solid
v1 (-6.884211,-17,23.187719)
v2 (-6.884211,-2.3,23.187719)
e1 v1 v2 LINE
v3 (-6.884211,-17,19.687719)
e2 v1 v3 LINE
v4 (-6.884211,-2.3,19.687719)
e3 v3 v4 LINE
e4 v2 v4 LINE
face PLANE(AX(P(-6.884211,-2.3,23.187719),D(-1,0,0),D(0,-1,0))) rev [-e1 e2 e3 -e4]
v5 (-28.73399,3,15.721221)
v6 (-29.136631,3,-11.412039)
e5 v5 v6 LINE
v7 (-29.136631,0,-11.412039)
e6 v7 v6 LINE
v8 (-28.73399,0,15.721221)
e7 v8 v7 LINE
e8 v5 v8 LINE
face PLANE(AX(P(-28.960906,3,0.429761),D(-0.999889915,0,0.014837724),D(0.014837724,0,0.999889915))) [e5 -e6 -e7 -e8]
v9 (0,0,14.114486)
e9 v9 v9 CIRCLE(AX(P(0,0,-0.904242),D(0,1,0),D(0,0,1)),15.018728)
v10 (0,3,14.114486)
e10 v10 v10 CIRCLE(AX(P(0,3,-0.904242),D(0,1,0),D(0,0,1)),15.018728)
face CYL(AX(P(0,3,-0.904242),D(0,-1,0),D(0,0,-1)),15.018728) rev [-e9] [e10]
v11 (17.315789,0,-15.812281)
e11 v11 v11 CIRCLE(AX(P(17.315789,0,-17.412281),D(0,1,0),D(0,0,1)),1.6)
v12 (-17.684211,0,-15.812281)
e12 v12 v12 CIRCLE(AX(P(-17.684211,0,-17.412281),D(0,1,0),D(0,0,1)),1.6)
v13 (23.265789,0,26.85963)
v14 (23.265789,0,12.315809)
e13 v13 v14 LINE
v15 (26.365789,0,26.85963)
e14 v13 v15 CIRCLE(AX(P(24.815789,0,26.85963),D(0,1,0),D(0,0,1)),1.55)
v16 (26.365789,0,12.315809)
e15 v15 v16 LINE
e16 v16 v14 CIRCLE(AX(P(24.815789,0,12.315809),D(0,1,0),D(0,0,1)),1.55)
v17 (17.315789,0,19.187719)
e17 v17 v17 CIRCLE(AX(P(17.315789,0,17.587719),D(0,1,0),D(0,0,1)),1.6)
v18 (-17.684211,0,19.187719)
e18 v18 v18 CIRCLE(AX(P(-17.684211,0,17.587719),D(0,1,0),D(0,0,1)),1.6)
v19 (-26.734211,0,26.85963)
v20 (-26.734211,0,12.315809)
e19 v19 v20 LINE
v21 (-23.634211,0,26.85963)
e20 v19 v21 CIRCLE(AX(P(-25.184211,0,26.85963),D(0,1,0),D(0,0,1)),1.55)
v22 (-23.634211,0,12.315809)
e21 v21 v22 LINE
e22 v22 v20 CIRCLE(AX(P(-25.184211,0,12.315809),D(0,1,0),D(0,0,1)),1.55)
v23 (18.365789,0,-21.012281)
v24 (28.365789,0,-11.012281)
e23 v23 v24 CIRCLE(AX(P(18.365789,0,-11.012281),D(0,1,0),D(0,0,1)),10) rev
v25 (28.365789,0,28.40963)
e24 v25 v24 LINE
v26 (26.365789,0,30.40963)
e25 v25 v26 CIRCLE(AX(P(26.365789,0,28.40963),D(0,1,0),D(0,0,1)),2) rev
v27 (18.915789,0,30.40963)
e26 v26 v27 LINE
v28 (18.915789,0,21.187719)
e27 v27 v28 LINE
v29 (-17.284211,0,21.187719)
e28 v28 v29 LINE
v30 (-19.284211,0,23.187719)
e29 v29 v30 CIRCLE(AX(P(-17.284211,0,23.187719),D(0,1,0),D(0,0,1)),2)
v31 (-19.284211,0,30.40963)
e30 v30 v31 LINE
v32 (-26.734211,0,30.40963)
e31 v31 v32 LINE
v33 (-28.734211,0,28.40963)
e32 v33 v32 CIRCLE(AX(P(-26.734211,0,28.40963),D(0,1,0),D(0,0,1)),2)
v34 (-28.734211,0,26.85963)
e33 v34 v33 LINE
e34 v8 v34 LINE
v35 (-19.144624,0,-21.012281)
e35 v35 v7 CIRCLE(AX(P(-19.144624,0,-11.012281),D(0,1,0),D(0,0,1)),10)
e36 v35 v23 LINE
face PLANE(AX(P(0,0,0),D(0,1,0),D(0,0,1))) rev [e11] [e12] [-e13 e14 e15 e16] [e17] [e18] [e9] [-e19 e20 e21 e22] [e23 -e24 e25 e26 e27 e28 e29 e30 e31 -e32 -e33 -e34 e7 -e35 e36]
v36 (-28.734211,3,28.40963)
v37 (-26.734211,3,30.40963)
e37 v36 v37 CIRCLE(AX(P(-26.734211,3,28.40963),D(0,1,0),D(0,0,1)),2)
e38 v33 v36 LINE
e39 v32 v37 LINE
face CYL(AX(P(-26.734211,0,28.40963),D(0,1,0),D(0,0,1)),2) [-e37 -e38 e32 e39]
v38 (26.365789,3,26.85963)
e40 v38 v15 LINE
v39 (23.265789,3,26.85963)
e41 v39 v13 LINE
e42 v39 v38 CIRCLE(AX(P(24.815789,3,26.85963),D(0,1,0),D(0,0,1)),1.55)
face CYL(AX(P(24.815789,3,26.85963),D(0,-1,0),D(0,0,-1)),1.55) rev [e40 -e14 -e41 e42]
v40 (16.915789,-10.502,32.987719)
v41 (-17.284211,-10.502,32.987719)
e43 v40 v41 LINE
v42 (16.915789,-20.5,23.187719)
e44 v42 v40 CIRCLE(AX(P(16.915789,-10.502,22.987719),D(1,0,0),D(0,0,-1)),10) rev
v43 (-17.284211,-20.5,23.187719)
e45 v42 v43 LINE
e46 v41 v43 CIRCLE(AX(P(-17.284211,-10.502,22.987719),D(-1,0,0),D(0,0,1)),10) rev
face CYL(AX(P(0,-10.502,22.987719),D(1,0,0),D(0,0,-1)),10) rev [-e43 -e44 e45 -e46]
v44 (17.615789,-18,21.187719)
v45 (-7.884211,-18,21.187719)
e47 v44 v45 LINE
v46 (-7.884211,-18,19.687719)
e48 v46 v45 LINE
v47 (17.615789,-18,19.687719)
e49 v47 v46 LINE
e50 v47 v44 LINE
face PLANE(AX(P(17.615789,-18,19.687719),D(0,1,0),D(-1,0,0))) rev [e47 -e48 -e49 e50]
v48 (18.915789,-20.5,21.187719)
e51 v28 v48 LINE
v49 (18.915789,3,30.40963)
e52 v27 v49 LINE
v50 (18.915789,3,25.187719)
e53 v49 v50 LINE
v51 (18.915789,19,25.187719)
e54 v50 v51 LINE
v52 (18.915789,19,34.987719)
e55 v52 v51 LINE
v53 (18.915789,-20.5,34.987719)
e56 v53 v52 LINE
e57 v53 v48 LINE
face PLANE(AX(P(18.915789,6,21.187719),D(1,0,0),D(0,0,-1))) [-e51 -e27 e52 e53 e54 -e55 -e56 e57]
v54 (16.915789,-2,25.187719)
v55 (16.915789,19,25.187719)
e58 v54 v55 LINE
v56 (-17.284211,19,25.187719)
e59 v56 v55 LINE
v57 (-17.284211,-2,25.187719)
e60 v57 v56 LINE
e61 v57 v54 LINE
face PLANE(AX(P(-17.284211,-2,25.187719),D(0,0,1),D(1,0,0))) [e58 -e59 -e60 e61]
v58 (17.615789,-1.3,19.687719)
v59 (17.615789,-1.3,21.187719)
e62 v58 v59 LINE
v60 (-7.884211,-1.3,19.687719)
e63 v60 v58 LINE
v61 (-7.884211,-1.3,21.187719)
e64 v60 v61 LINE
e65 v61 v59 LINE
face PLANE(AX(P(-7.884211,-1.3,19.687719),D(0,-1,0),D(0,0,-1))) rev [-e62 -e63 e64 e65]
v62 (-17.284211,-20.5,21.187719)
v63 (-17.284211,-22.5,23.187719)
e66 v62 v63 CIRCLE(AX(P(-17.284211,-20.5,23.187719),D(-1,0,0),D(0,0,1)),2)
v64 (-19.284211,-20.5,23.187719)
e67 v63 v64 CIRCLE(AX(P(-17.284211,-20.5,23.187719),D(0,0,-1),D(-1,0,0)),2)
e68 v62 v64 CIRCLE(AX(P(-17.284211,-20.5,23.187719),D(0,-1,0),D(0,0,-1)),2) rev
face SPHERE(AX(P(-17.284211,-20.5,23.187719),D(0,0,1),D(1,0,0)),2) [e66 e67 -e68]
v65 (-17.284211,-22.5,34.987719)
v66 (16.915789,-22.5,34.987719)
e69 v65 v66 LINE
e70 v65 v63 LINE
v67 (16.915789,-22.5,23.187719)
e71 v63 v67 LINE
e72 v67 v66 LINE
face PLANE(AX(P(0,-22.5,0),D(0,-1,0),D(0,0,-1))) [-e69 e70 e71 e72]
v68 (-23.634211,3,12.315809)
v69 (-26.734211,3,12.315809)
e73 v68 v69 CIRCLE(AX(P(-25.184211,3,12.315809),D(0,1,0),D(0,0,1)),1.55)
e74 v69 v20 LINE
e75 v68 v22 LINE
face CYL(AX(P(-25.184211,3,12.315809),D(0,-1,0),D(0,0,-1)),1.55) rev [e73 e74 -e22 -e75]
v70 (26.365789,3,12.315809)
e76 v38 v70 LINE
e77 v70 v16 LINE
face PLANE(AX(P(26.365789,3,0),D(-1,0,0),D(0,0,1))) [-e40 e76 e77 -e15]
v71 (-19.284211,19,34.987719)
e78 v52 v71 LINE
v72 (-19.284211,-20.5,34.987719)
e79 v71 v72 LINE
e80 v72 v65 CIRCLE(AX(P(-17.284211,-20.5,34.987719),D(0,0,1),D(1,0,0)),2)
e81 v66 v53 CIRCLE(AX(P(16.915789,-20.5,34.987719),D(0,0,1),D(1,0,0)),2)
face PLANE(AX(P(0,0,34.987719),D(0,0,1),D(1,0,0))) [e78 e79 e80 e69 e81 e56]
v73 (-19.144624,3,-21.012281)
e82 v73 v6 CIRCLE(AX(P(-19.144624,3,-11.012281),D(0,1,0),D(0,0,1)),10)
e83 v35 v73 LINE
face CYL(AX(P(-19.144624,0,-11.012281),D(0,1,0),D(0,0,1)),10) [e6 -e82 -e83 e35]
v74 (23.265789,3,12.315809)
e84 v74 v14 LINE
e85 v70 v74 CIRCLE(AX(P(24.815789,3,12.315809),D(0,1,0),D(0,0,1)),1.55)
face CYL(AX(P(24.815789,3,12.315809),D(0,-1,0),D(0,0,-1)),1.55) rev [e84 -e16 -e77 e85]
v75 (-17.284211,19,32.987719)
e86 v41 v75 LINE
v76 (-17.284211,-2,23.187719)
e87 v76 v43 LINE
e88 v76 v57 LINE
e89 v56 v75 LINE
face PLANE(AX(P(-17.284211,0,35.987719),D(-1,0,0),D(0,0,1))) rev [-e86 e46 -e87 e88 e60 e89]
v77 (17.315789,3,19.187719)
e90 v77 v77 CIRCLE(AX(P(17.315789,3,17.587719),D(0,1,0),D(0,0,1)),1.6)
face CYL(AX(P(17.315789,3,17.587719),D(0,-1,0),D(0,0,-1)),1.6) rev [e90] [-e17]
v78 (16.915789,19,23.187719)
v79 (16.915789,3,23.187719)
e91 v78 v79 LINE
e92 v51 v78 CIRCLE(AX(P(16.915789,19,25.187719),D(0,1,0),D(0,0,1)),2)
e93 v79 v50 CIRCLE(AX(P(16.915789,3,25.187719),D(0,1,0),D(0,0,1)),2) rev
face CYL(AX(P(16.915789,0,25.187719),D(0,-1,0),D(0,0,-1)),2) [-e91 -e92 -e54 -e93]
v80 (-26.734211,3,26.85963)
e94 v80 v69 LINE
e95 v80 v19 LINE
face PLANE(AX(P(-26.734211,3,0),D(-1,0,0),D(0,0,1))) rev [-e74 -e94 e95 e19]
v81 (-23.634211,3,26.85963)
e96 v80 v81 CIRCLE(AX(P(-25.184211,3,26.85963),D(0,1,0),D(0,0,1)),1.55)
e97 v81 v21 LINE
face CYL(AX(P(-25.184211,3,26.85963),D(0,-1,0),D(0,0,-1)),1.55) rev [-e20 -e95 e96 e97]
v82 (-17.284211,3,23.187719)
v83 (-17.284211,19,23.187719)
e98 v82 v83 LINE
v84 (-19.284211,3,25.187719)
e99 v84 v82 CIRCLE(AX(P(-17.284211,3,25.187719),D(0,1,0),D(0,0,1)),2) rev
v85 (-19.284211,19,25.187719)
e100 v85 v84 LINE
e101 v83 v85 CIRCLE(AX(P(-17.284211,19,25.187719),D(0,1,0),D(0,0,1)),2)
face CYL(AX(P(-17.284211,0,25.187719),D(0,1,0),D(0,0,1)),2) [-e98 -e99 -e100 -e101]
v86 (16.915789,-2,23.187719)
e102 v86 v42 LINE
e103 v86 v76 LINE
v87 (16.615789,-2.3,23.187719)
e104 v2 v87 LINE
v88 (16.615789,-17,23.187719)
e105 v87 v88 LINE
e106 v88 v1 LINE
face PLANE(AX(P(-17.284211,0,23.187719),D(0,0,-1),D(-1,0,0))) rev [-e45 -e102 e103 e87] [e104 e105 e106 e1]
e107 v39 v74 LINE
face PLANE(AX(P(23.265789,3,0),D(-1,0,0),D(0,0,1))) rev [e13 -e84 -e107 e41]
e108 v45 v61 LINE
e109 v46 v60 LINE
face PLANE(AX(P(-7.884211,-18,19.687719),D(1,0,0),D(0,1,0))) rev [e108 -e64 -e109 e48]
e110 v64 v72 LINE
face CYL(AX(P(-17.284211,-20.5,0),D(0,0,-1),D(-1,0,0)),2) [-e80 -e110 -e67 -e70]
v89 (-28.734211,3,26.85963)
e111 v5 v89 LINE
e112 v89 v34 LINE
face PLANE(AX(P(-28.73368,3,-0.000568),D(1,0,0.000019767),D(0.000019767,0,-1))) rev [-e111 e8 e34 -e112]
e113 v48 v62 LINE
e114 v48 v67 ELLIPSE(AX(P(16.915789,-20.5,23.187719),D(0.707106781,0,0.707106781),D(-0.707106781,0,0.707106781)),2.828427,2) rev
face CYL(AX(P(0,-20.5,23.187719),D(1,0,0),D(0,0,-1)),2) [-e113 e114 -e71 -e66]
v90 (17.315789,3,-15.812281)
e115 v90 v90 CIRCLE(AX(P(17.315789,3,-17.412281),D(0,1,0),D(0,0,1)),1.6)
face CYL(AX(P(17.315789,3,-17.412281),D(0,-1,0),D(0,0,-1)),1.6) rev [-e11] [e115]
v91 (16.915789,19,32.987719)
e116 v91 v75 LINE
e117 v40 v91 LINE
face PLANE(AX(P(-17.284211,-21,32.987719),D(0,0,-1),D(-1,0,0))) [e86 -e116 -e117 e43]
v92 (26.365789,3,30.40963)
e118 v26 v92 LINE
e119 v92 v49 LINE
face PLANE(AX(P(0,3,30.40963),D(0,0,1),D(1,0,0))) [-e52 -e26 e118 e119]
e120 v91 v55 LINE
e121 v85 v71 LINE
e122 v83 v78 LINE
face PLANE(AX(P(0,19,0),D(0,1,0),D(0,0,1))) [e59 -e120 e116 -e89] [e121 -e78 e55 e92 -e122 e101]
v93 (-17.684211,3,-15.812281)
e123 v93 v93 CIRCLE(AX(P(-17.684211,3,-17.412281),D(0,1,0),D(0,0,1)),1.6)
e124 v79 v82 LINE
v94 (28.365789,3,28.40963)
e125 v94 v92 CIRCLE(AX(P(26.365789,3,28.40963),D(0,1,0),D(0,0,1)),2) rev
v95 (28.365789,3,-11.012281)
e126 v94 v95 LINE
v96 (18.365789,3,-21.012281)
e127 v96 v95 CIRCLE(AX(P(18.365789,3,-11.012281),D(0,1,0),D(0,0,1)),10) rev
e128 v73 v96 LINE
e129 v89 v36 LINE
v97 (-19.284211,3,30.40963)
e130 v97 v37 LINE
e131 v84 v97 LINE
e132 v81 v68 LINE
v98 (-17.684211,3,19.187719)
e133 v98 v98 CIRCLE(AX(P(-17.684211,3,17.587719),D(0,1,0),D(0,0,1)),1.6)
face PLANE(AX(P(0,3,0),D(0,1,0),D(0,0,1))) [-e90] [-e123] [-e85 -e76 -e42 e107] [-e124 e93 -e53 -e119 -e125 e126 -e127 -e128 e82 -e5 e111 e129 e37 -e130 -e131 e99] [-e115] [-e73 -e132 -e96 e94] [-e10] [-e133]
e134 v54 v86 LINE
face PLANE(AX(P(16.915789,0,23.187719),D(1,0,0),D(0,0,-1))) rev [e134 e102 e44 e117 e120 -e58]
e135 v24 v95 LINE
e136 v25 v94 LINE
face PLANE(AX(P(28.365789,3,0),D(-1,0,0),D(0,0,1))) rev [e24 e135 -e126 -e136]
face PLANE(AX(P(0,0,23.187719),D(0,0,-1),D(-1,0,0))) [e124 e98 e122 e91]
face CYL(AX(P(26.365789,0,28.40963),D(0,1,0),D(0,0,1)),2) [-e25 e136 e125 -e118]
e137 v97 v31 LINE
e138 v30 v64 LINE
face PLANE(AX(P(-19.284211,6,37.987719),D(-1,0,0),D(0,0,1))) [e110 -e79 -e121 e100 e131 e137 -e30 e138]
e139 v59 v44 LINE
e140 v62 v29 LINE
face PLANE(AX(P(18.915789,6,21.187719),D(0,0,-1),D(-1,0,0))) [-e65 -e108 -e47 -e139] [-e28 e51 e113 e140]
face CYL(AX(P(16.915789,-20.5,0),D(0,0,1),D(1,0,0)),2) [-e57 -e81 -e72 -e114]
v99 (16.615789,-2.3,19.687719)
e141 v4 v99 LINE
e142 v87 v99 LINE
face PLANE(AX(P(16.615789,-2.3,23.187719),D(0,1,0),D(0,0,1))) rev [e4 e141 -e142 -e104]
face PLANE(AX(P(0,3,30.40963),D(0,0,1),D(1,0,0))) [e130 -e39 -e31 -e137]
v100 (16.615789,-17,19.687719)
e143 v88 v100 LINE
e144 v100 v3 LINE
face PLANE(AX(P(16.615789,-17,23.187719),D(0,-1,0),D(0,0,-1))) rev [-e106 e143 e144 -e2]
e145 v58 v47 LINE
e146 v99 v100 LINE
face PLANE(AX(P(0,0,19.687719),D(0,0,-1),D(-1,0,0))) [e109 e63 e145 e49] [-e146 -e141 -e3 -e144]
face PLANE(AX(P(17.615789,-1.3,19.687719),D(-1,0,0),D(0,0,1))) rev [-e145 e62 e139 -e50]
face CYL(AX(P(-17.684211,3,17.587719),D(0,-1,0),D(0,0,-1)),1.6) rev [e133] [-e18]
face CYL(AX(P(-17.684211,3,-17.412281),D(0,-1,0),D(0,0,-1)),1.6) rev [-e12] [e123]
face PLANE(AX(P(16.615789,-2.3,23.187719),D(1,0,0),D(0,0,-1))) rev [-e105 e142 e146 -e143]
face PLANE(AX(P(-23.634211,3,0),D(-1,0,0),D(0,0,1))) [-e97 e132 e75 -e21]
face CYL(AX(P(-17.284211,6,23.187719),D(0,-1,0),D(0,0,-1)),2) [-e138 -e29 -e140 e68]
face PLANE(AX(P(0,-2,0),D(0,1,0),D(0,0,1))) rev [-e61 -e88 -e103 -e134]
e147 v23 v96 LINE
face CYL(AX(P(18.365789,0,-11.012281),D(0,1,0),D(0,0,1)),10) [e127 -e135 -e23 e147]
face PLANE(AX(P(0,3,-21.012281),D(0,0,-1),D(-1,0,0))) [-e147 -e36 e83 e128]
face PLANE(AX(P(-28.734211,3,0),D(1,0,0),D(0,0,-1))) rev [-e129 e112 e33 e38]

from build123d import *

# Parameters (mm, degrees)
CROQUIS1_R                    = 1.6
SALIENTE_EXTRUIR1_DEPTH       = 3
SALIENTE_EXTRUIR2_DEPTH       = 40
SALIENTE_EXTRUIR2_DEPTH_BACK  = 6
CROQUIS2_W                    = 38.2
CROQUIS2_H                    = 16.8
CROQUIS3_W                    = 34.2
CROQUIS3_H                    = 12.8
CORTAR_EXTRUIR1_DEPTH         = 40
CROQUIS5_W                    = 23.5
CROQUIS5_H                    = 14.7
CORTAR_EXTRUIR2_DEPTH         = 2
CROQUIS7_W                    = 25.5
CROQUIS7_H                    = 16.7
CROQUIS7_W_2                  = 23.5
CROQUIS7_H_2                  = 14.7
SALIENTE_EXTRUIR11_DEPTH      = 1.5
CROQUIS8_W                    = 38.2
CROQUIS8_H                    = 16.8
CORTAR_EXTRUIR8_DEPTH         = 19.5
CROQUIS9_W                    = 38.2
CROQUIS9_H                    = 16.8
SALIENTE_EXTRUIR12_DEPTH      = 2
CROQUIS11_W                   = 38.2
CROQUIS11_H                   = 16.8
SALIENTE_EXTRUIR13_DEPTH      = 13
CROQUIS12_W                   = 34.2
CROQUIS12_H                   = 12.8
CORTAR_EXTRUIR9_DEPTH         = 25
CROQUIS13_W                   = 5.5
CROQUIS13_H                   = 5
SALIENTE_EXTRUIR14_DEPTH      = 15
SALIENTE_EXTRUIR15_DEPTH      = 10
SALIENTE_EXTRUIR15_DEPTH_BACK = 14
CROQUIS14_W                   = 3.5
CROQUIS14_H                   = 12.8
CROQUIS16_W                   = 12.8
CROQUIS16_H                   = 24
SALIENTE_EXTRUIR16_DEPTH      = 2.5
CORTAR_EXTRUIR12_DEPTH        = 3
CROQUIS20_W                   = 7.565862741
CROQUIS20_H                   = 3.217792011
CORTAR_EXTRUIR13_DEPTH        = 0.5
CROQUIS22_W                   = 6
CROQUIS22_H                   = 12.8
CORTAR_EXTRUIR14_DEPTH        = 27
CROQUIS23_W                   = 34.2
CROQUIS23_H                   = 3
SALIENTE_EXTRUIR17_DEPTH      = 40
REDONDEO3_R                   = 10
CROQUIS24_W                   = 34.2
CROQUIS24_H                   = 2
SALIENTE_EXTRUIR18_DEPTH      = 21
CROQUIS25_W                   = 38.2
CROQUIS25_H                   = 16
CORTAR_EXTRUIR15_DEPTH        = 2
CROQUIS26_W                   = 38.2
CROQUIS26_H                   = 41.5
CORTAR_EXTRUIR16_DEPTH        = 3
REDONDEO4_R                   = 2


with BuildPart() as part:
    # Croquis1 → Saliente-Extruir1 (new body)
    # profile 1 of 2: a face of its own
    with BuildSketch(Plane(origin=(0, 0, 0), x_dir=(1, 0, 0), z_dir=(0, 1, 0))):
        Polygon((-25.184210526, -30.409629763), (0, -30.409629763), (26.365789474, -30.409629763), (28.365789474, -30.409629763), (28.365789474, -12.315808834), (28.365789474, 17.012280702), (28.365789474, 19.012280702), (28.365789474, 21.012280702), (-29.249413206, 21.012280702), (-29.249413206, 19.012280702), (-28.733990356, -15.721221442), (-28.734210526, -26.859629763), (-28.734210526, -30.409629763), align=None)
        with BuildLine():
            ThreePointArc((-23.634210526, -26.859629763), (-25.184210526, -28.409629763), (-26.734210526, -26.859629763))
            Line((-26.734210526, -26.859629763), (-26.734210526, -12.315808834))
            ThreePointArc((-26.734210526, -12.315808834), (-25.184210526, -10.765808834), (-23.634210526, -12.315808834))
            Line((-23.634210526, -12.315808834), (-23.634210526, -26.859629763))
        make_face(mode=Mode.SUBTRACT)
        with Locations(Location((-17.684210526, -17.587719298, 0), (0, 0, 270))):
            Circle(CROQUIS1_R, mode=Mode.SUBTRACT)
        with Locations(Location((17.315789474, -17.587719298, 0), (0, 0, 270))):
            Circle(CROQUIS1_R, mode=Mode.SUBTRACT)
        with BuildLine():
            Line((26.365789474, -12.315808834), (26.365789474, -26.859629763))
            ThreePointArc((26.365789474, -26.859629763), (24.815789474, -28.409629763), (23.265789474, -26.859629763))
            Line((23.265789474, -26.859629763), (23.265789474, -12.315808834))
            ThreePointArc((23.265789474, -12.315808834), (24.815789474, -10.765808834), (26.365789474, -12.315808834))
        make_face(mode=Mode.SUBTRACT)
        with Locations(Location((-17.684210526, 17.412280702, 0), (0, 0, 270))):
            Circle(CROQUIS1_R, mode=Mode.SUBTRACT)
        with BuildLine():
            ThreePointArc((0, -14.11448633), (-15.018728155, 0.904241825), (0, 15.922969981))
            ThreePointArc((0, 15.922969981), (10.619844524, 11.524086349), (15.018728155, 0.904241825))
            ThreePointArc((15.018728155, 0.904241825), (10.619844524, -9.715602698), (0, -14.11448633))
        make_face(mode=Mode.SUBTRACT)
        with Locations(Location((17.315789474, 17.412280702, 0), (0, 0, 270))):
            Circle(CROQUIS1_R, mode=Mode.SUBTRACT)
    # profile 2 of 2: a face of its own
    with BuildSketch(Plane(origin=(0, 0, 0), x_dir=(1, 0, 0), z_dir=(0, 1, 0))):
        Polygon((-25.184210526, -30.409629763), (0, -30.409629763), (26.365789474, -30.409629763), (28.365789474, -30.409629763), (28.365789474, -12.315808834), (28.365789474, 17.012280702), (28.365789474, 19.012280702), (28.365789474, 21.012280702), (-29.249413206, 21.012280702), (-29.249413206, 19.012280702), (-28.733990356, -15.721221442), (-28.734210526, -26.859629763), (-28.734210526, -30.409629763), align=None)
        with BuildLine():
            ThreePointArc((-23.634210526, -26.859629763), (-25.184210526, -28.409629763), (-26.734210526, -26.859629763))
            Line((-26.734210526, -26.859629763), (-26.734210526, -12.315808834))
            ThreePointArc((-26.734210526, -12.315808834), (-25.184210526, -10.765808834), (-23.634210526, -12.315808834))
            Line((-23.634210526, -12.315808834), (-23.634210526, -26.859629763))
        make_face(mode=Mode.SUBTRACT)
        with Locations(Location((-17.684210526, -17.587719298, 0), (0, 0, 270))):
            Circle(CROQUIS1_R, mode=Mode.SUBTRACT)
        with Locations(Location((17.315789474, -17.587719298, 0), (0, 0, 270))):
            Circle(CROQUIS1_R, mode=Mode.SUBTRACT)
        with BuildLine():
            Line((26.365789474, -12.315808834), (26.365789474, -26.859629763))
            ThreePointArc((26.365789474, -26.859629763), (24.815789474, -28.409629763), (23.265789474, -26.859629763))
            Line((23.265789474, -26.859629763), (23.265789474, -12.315808834))
            ThreePointArc((23.265789474, -12.315808834), (24.815789474, -10.765808834), (26.365789474, -12.315808834))
        make_face(mode=Mode.SUBTRACT)
        with Locations(Location((-17.684210526, 17.412280702, 0), (0, 0, 270))):
            Circle(CROQUIS1_R, mode=Mode.SUBTRACT)
        with BuildLine():
            ThreePointArc((0, -14.11448633), (-15.018728155, 0.904241825), (0, 15.922969981))
            ThreePointArc((0, 15.922969981), (10.619844524, 11.524086349), (15.018728155, 0.904241825))
            ThreePointArc((15.018728155, 0.904241825), (10.619844524, -9.715602698), (0, -14.11448633))
        make_face(mode=Mode.SUBTRACT)
        with Locations(Location((17.315789474, 17.412280702, 0), (0, 0, 270))):
            Circle(CROQUIS1_R, mode=Mode.SUBTRACT)
    extrude(amount=SALIENTE_EXTRUIR1_DEPTH)

    # Croquis2 → Saliente-Extruir2 (add, two sides: drawn at the far end of the back side and taken through both)
    with BuildSketch(Plane.XZ.offset(-SALIENTE_EXTRUIR2_DEPTH_BACK)):
        with Locations((-0.184210526, 29.587719298)):
            Rectangle(CROQUIS2_W, CROQUIS2_H)
    extrude(amount=SALIENTE_EXTRUIR2_DEPTH + SALIENTE_EXTRUIR2_DEPTH_BACK)

    # Croquis3 → Cortar-Extruir1 (cut)
    with BuildSketch(Plane.XZ.offset(40)):
        with Locations((-0.184210526, 29.587719298)):
            Rectangle(CROQUIS3_W, CROQUIS3_H)
    extrude(amount=-CORTAR_EXTRUIR1_DEPTH, mode=Mode.SUBTRACT)

    # Croquis5 → Cortar-Extruir2 (cut)
    with BuildSketch(Plane(origin=(0, 0, 21.187719298), x_dir=(-1, 0, 0), z_dir=(0, 0, -1))):
        with Locations((-4.865789474, -9.65)):
            Rectangle(CROQUIS5_W, CROQUIS5_H)
    extrude(amount=-CORTAR_EXTRUIR2_DEPTH, mode=Mode.SUBTRACT)

    # Croquis7 → Saliente-Extruir11 (add)
    with BuildSketch(Plane(origin=(0, 0, 21.187719298), x_dir=(-1, 0, 0), z_dir=(0, 0, -1))):
        with Locations((-4.865789474, -9.65)):
            Rectangle(CROQUIS7_W, CROQUIS7_H)
        with Locations((-4.865789474, -9.65)):
            Rectangle(CROQUIS7_W_2, CROQUIS7_H_2, mode=Mode.SUBTRACT)
    extrude(amount=SALIENTE_EXTRUIR11_DEPTH)

    # Croquis8 → Cortar-Extruir8 (cut)
    with BuildSketch(Plane.XZ.offset(40)):
        with Locations((-0.184210526, 29.587719298)):
            Rectangle(CROQUIS8_W, CROQUIS8_H)
    extrude(amount=-CORTAR_EXTRUIR8_DEPTH, mode=Mode.SUBTRACT)

    # Croquis9 → Saliente-Extruir12 (add)
    with BuildSketch(Plane.XZ.offset(20.5)):
        with Locations((-0.184210526, 29.587719298)):
            Rectangle(CROQUIS9_W, CROQUIS9_H)
    extrude(amount=SALIENTE_EXTRUIR12_DEPTH)

    # Croquis11 → Saliente-Extruir13 (add)
    with BuildSketch(Plane(origin=(0, 6, 0), x_dir=(1, 0, 0), z_dir=(0, 1, 0))):
        with Locations((-0.184210526, -29.587719298)):
            Rectangle(CROQUIS11_W, CROQUIS11_H)
    extrude(amount=SALIENTE_EXTRUIR13_DEPTH)

    # Croquis12 → Cortar-Extruir9 (cut)
    with BuildSketch(Plane(origin=(0, 19, 0), x_dir=(1, 0, 0), z_dir=(0, 1, 0))):
        with Locations((-0.184210526, -29.587719298)):
            Rectangle(CROQUIS12_W, CROQUIS12_H)
    extrude(amount=-CORTAR_EXTRUIR9_DEPTH, mode=Mode.SUBTRACT)

    # Croquis13 → Saliente-Extruir14 (add)
    with BuildSketch(Plane(origin=(0, 0, 21.187719298), x_dir=(-1, 0, 0), z_dir=(0, 0, -1))):
        with Locations((16.534210526, -2.5)):
            Rectangle(CROQUIS13_W, CROQUIS13_H)
    extrude(amount=-SALIENTE_EXTRUIR14_DEPTH)

    # Croquis14 → Saliente-Extruir15 (add, two sides: drawn at the far end of the back side and taken through both)
    with BuildSketch(Plane(origin=(0, 0, 0), x_dir=(1, 0, 0), z_dir=(0, 1, 0)).offset(-SALIENTE_EXTRUIR15_DEPTH_BACK)):
        with Locations((-15.534210526, -29.587719298)):
            Rectangle(CROQUIS14_W, CROQUIS14_H)
    extrude(amount=SALIENTE_EXTRUIR15_DEPTH + SALIENTE_EXTRUIR15_DEPTH_BACK)

    # Croquis16 → Saliente-Extruir16 (add)
    with BuildSketch(Plane(origin=(-13.784210526, 0, 0), x_dir=(0, 0, -1), z_dir=(1, 0, 0))):
        with Locations((-29.587719298, -2)):
            Rectangle(CROQUIS16_W, CROQUIS16_H)
    extrude(amount=SALIENTE_EXTRUIR16_DEPTH)

    # Croquis19 → Cortar-Extruir12 (cut)
    with BuildSketch(Plane(origin=(0, 3, 0), x_dir=(1, 0, 0), z_dir=(0, 1, 0))):
        with BuildLine():
            Line((28.365789474, 21.012280702), (18.365789474, 21.012280702))
            ThreePointArc((18.365789474, 21.012280702), (25.436857286, 18.083348514), (28.365789474, 11.012280702))
            Line((28.365789474, 11.012280702), (28.365789474, 21.012280702))
        make_face()
        with BuildLine():
            Line((-29.249413206, 21.012280702), (-29.179333075, 14.289695354))
            Line((-29.179333075, 14.289695354), (-29.13663051, 11.412039439))
            ThreePointArc((-29.13663051, 11.412039439), (-26.072914346, 18.223299609), (-19.144624058, 21.012280702))
            Line((-19.144624058, 21.012280702), (-29.249413206, 21.012280702))
        make_face()
        with BuildLine():
            Line((28.365789474, -30.409629763), (28.365789474, -28.409629763))
            ThreePointArc((28.365789474, -28.409629763), (27.780003036, -29.823843325), (26.365789474, -30.409629763))
            Line((26.365789474, -30.409629763), (28.365789474, -30.409629763))
        make_face()
        with BuildLine():
            ThreePointArc((-28.734210526, -28.409629763), (-28.148424089, -29.823843325), (-26.734210526, -30.409629763))
            Line((-26.734210526, -30.409629763), (-28.734210526, -30.409629763))
            Line((-28.734210526, -30.409629763), (-28.734210526, -28.409629763))
        make_face()
    extrude(amount=-CORTAR_EXTRUIR12_DEPTH, mode=Mode.SUBTRACT)


with BuildPart() as cortar_extruir12_piece_1:
    # of the separate pieces the step leaves, piece 1, a body of its own (cortar_extruir12_pieces)
    add(part.part.solids().sort_by_distance((-26.734210526, 0, 30.409629763))[0])

    # Croquis22 → Cortar-Extruir14 (cut)
    with BuildSketch(Plane(origin=(0, 10, 0), x_dir=(1, 0, 0), z_dir=(0, 1, 0))):
        with Locations((-14.284210526, -29.587719298)):
            Rectangle(CROQUIS22_W, CROQUIS22_H)
    extrude(amount=-CORTAR_EXTRUIR14_DEPTH, mode=Mode.SUBTRACT)

    # Croquis23 → Saliente-Extruir17 (add)
    with BuildSketch(Plane(origin=(0, 19, 0), x_dir=(1, 0, 0), z_dir=(0, 1, 0))):
        with Locations((-0.184210526, -34.487719298)):
            Rectangle(CROQUIS23_W, CROQUIS23_H)
    extrude(amount=-SALIENTE_EXTRUIR17_DEPTH)

    # Redondeo3
    # the kernel refuses this fillet: 10 mm, written as the material it adds along each edge
    with BuildSketch(Plane(origin=(16.915789474, -20.5, 32.987719298), x_dir=(0, 1, 0), z_dir=(-1, 0, 0))) as redondeo3_piece_1:
        with BuildLine():
            CenterArc((9.9979998, 10), REDONDEO3_R, 181.145991998, 88.854008002)
            Line((0, 9.8), (-0.199959996, 9.796))
            ThreePointArc((-0.199959996, 9.796), (-0.2, 4.9), (-0.2, 0))
            Line((-0.2, 0), (0, -0.2))
            Line((0, -0.2), (9.9979998, -0.2))
            Line((9.9979998, -0.2), (9.9979998, 0))
        make_face()
    extrude(amount=34.2)

    # Croquis24 → Saliente-Extruir18 (add)
    with BuildSketch(Plane(origin=(0, 19, 0), x_dir=(1, 0, 0), z_dir=(0, 1, 0))):
        with Locations((-0.184210526, -24.187719298)):
            Rectangle(CROQUIS24_W, CROQUIS24_H)
    extrude(amount=-SALIENTE_EXTRUIR18_DEPTH)

    # Croquis25 → Cortar-Extruir15 (cut)
    with BuildSketch(Plane(origin=(0, 0, 21.187719298), x_dir=(-1, 0, 0), z_dir=(0, 0, -1))):
        with Locations((0.184210526, 11)):
            Rectangle(CROQUIS25_W, CROQUIS25_H)
    extrude(amount=-CORTAR_EXTRUIR15_DEPTH, mode=Mode.SUBTRACT)

    # Croquis26 → Cortar-Extruir16 (cut)
    with BuildSketch(Plane.XY.offset(37.987719298)):
        with Locations((-0.184210526, -1.75)):
            Rectangle(CROQUIS26_W, CROQUIS26_H)
    extrude(amount=-CORTAR_EXTRUIR16_DEPTH, mode=Mode.SUBTRACT)

    # Redondeo4
    redondeo4_edges = [cortar_extruir12_piece_1.edges().sort_by_distance(p)[0] for p in [
        (-19.284210526, -11.25, 21.187719298),
        (-19.284210526, -22.5, 28.087719298),
        (-0.184210526, -22.5, 21.187719298),
        (18.915789474, -22.5, 28.087719298),
        (-19.284210526, 11, 23.187719298),
        (18.915789474, 11, 23.187719298),
    ]]
    fillet(redondeo4_edges, radius=REDONDEO4_R)


with BuildPart() as cortar_extruir12_piece_2:
    # of the separate pieces the step leaves, piece 2, a body of its own (cortar_extruir12_pieces)
    add(part.part.solids().sort_by_distance((-29.249413206, 0, -21.012280702))[0])

    # Croquis20 → Cortar-Extruir13 (cut)
    with BuildSketch(Plane(origin=(-28.960905799, 0, 0.42976123), x_dir=(0.014837723757860641, 0, 0.99988991491748), z_dir=(-0.99988991491748, 0, 0.014837723757860641))):
        with Locations((-18.504008527, 1.391103994)):
            Rectangle(CROQUIS20_W, CROQUIS20_H)
    extrude(amount=-CORTAR_EXTRUIR13_DEPTH, mode=Mode.SUBTRACT)


solid = cortar_extruir12_piece_1.part
